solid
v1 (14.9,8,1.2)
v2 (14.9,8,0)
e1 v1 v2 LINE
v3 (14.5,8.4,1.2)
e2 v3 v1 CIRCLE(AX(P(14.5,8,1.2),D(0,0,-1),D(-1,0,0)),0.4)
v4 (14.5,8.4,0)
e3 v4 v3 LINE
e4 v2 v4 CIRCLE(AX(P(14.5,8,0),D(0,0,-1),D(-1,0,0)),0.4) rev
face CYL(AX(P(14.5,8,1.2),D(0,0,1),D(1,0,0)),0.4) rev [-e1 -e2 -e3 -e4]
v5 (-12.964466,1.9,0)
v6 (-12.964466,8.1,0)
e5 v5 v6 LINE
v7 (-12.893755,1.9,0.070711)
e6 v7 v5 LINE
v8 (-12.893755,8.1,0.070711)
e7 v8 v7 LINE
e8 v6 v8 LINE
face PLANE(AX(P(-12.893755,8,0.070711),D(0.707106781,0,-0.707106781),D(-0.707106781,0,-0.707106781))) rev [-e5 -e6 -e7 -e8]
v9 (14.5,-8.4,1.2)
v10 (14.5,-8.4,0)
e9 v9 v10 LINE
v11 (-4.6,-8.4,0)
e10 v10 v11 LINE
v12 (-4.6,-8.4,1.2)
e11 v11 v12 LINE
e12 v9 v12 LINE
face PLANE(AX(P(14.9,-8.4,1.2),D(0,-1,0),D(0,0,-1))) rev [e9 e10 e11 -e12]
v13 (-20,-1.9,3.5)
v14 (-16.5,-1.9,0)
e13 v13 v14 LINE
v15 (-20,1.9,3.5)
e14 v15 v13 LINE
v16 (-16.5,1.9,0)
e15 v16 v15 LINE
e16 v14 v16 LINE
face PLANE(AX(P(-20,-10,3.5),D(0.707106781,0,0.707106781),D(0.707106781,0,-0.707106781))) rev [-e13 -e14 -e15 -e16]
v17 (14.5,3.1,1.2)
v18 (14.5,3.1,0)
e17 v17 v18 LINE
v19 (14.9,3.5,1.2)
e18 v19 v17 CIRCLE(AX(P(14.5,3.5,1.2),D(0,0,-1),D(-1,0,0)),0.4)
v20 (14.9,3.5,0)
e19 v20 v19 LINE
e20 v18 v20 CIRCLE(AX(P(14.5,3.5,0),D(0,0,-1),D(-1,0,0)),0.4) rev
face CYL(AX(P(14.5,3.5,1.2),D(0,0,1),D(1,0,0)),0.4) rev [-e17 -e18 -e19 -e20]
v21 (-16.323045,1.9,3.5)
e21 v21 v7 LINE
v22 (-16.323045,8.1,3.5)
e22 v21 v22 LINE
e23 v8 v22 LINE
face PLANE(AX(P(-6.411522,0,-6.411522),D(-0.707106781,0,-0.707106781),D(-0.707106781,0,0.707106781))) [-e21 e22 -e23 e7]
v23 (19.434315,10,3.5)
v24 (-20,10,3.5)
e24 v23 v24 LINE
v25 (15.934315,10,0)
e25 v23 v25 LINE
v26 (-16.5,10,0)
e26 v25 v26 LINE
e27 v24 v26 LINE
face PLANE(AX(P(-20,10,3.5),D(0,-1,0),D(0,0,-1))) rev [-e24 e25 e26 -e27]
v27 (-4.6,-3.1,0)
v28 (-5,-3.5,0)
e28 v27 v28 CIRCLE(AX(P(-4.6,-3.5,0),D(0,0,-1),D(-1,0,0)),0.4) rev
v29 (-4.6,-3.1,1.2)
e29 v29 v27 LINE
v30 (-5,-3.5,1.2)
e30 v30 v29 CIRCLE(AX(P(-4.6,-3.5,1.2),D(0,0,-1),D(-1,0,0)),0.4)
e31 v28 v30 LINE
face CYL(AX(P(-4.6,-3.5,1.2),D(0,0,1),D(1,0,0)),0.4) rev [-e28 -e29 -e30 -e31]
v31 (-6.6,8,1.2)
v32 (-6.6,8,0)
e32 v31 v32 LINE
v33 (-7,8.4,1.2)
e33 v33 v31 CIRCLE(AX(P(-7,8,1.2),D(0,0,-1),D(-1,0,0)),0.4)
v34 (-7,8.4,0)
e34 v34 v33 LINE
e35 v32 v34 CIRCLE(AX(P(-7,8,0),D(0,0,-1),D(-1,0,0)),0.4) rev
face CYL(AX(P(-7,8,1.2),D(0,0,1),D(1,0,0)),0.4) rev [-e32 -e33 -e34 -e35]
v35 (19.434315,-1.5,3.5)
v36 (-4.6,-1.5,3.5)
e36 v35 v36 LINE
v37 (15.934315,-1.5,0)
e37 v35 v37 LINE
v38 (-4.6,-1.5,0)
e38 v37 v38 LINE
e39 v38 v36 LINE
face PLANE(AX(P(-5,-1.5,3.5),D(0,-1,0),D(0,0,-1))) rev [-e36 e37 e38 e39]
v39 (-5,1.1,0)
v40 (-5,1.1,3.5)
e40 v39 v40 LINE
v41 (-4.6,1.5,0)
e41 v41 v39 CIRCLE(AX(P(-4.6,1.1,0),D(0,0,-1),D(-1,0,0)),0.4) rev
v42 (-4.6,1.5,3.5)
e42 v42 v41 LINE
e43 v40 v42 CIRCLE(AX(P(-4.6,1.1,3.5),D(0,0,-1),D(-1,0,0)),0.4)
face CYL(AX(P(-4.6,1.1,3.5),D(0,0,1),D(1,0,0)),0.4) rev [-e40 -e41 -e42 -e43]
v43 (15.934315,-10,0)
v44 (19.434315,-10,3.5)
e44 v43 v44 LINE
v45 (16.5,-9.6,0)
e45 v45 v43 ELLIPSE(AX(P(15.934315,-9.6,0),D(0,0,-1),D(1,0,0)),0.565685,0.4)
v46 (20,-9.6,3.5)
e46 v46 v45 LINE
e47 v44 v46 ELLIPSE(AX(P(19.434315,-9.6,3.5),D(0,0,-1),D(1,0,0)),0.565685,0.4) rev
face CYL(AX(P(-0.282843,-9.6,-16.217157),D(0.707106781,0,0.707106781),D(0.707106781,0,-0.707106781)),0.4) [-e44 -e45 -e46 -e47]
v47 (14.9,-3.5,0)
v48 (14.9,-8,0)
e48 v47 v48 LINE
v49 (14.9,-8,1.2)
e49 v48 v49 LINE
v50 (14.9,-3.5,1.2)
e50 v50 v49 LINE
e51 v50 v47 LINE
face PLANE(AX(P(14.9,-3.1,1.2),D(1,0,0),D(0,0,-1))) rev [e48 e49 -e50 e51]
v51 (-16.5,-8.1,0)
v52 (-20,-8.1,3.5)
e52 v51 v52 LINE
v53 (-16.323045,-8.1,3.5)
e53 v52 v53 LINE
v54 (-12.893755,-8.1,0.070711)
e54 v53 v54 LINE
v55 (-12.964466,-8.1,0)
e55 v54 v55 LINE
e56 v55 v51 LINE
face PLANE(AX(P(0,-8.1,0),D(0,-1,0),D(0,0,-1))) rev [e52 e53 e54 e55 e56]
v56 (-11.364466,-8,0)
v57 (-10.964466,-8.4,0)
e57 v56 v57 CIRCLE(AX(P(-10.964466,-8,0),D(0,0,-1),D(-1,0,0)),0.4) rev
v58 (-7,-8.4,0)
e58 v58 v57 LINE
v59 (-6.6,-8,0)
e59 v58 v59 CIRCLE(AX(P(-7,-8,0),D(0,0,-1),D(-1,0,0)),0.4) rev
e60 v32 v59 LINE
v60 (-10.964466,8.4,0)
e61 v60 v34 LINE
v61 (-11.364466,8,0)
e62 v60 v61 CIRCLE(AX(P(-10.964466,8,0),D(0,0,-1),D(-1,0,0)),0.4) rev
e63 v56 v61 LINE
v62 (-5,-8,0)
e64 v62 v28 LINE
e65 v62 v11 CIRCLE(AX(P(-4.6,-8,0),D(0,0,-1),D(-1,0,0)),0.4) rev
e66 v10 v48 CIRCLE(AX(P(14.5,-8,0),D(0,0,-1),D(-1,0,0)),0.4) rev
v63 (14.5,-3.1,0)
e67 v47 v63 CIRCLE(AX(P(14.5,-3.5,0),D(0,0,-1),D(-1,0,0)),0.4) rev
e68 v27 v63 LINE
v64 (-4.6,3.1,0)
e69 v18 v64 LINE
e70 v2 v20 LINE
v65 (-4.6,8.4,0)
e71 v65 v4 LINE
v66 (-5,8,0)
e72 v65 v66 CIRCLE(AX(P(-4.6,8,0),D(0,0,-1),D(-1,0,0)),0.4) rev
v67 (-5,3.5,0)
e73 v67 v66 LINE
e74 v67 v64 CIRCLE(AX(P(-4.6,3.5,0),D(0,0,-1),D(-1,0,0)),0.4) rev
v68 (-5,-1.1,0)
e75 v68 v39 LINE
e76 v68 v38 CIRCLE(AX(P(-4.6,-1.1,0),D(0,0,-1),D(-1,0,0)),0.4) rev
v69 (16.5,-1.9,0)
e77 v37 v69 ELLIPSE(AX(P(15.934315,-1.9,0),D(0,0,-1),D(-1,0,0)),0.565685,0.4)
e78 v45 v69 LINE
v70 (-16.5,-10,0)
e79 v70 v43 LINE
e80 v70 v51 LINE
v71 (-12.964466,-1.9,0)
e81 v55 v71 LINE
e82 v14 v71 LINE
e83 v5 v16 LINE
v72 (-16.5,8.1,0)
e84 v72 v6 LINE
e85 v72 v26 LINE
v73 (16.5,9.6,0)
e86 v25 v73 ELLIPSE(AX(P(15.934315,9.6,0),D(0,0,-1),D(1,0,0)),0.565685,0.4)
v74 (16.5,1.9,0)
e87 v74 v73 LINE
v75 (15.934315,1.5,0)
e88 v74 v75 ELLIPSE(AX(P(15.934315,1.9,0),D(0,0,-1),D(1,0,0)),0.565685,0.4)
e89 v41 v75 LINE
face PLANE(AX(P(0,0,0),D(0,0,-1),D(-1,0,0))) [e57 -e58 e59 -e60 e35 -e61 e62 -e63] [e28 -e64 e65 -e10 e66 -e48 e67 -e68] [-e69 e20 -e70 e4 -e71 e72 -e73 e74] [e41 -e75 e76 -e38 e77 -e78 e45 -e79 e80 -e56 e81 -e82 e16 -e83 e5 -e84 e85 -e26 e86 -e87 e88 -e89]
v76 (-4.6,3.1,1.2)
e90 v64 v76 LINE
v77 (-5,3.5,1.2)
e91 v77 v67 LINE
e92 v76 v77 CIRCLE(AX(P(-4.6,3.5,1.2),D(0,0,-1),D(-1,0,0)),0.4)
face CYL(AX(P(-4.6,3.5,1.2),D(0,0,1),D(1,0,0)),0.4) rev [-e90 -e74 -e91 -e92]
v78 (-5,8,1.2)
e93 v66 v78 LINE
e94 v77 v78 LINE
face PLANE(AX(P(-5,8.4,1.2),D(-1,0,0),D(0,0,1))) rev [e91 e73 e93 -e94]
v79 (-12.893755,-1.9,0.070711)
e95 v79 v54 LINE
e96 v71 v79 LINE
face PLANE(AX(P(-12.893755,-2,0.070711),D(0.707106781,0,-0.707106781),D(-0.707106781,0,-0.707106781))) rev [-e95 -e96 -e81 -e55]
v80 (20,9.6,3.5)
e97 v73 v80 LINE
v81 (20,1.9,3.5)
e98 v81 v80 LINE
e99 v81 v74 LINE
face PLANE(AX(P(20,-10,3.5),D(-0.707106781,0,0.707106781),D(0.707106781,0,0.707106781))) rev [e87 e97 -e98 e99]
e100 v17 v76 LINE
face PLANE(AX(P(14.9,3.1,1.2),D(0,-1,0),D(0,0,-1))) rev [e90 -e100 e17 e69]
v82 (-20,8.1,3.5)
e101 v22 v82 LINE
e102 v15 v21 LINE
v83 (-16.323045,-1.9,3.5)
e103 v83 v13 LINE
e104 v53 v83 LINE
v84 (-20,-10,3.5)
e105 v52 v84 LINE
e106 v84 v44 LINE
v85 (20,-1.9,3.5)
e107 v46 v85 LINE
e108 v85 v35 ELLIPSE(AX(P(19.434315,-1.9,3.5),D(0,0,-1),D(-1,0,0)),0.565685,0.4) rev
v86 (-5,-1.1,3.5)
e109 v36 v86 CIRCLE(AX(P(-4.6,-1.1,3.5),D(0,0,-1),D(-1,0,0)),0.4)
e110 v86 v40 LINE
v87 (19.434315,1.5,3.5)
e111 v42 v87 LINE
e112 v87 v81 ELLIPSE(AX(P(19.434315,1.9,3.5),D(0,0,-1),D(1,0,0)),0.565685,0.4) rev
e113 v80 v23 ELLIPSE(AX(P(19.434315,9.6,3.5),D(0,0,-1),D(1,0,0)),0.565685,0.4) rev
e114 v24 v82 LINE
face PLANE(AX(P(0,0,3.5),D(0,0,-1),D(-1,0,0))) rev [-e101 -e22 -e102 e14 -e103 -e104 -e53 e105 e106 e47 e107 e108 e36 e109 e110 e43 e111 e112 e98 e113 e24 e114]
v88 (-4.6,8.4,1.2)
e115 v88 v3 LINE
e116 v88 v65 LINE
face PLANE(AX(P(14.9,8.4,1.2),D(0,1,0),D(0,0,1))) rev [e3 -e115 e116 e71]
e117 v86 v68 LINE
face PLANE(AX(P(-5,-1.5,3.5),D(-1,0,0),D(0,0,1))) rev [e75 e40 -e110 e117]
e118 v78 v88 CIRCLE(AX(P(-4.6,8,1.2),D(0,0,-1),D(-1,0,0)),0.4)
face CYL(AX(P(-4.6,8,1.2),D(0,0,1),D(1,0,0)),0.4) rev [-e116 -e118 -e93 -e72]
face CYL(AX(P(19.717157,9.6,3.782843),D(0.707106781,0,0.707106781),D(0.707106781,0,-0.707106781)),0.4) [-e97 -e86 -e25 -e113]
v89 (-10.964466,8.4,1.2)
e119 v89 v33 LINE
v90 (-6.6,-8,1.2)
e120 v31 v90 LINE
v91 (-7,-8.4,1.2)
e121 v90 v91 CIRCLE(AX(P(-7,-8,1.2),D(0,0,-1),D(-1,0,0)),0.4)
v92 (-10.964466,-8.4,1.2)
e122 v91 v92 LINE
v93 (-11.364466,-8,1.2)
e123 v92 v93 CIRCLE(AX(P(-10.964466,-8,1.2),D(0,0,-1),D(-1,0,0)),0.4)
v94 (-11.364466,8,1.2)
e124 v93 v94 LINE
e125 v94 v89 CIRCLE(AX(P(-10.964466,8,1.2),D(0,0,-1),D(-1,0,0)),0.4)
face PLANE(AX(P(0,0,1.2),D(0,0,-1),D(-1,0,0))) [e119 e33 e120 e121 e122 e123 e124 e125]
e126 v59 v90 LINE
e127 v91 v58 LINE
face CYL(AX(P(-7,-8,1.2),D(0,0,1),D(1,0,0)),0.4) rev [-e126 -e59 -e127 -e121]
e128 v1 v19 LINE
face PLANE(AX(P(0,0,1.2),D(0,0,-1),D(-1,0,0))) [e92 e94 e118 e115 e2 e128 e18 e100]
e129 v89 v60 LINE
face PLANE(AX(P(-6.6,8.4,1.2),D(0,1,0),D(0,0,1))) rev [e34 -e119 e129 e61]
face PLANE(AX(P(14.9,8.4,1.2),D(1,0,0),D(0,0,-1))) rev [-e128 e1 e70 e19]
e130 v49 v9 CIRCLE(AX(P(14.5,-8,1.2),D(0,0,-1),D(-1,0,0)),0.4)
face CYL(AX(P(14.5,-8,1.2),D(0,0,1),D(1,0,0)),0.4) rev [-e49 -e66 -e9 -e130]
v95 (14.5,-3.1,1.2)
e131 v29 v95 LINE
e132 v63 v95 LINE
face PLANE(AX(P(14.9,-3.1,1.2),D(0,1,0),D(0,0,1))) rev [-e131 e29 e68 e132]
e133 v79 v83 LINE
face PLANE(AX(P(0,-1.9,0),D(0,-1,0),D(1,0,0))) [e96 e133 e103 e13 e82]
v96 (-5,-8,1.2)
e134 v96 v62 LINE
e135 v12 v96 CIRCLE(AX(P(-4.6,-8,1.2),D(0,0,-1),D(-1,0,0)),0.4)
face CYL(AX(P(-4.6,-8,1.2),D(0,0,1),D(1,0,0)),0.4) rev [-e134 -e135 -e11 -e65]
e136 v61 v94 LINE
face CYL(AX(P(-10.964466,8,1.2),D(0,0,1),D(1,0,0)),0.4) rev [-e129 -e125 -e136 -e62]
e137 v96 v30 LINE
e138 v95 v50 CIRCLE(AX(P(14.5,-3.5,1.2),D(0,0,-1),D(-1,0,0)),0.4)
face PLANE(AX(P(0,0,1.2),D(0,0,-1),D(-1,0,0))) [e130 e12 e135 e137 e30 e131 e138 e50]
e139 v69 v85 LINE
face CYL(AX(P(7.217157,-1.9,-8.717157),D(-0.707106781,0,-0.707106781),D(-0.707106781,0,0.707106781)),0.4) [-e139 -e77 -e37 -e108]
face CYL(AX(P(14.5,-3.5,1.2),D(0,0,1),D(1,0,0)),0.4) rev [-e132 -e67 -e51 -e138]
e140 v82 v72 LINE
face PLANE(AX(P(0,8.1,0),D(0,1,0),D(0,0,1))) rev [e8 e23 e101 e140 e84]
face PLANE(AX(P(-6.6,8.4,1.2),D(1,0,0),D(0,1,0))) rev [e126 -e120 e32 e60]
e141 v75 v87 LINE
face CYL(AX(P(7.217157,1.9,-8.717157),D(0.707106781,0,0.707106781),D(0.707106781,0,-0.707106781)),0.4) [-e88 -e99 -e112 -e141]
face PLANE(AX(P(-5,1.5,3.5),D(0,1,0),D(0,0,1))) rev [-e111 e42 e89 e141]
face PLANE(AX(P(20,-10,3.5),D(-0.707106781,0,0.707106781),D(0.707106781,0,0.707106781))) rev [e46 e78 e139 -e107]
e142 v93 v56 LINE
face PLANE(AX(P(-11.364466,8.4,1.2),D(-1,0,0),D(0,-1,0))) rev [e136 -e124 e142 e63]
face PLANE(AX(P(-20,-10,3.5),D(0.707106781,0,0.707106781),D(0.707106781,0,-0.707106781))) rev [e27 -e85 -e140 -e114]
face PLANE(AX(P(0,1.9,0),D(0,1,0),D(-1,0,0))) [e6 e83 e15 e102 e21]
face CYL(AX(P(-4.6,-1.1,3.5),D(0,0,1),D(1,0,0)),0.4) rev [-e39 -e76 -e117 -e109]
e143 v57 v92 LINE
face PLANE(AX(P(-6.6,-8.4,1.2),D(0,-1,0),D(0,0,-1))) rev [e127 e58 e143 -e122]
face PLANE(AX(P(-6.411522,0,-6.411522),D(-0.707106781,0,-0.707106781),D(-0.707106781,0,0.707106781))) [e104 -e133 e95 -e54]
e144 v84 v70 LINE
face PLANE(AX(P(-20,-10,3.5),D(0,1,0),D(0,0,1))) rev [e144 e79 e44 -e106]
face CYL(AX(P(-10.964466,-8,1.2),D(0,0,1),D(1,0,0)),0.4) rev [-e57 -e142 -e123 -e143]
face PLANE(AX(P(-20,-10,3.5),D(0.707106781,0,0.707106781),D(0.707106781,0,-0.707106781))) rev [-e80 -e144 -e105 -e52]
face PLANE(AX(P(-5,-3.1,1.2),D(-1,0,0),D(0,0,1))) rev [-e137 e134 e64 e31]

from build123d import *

# Parameters (mm, degrees)
BOSS_EXTRUDE1_DEPTH = 3.5
CUT_EXTRUDE1_DEPTH  = 29.5
CUT_EXTRUDE2_DEPTH  = 29.5
CAVITY1_START       = -8
CAVITY1_DEPTH       = 6
CAVITY1_START_2     = 2
CAVITY1_2_DEPTH     = 6
SKETCH4_W           = 4.949747468
SKETCH4_H           = 6
CUT_EXTRUDE3_DEPTH  = 0.1
CUT_EXTRUDE4_DEPTH  = 0.1
CUT_EXTRUDE5_DEPTH  = 0.1
CUT_EXTRUDE6_DEPTH  = 0.1
CUT_EXTRUDE7_DEPTH  = 0.1
SKETCH9_W           = 19.9
SKETCH9_H           = 5.3
SKETCH9_W_2         = 4.764466094
SKETCH9_H_2         = 16.8
CUT_EXTRUDE8_DEPTH  = 1.2
FILLET1_R           = 0.4


# Read off the part's stored shape, not the designer's step: Cavity1
with BuildPart() as part:
    # Sketch1 → Boss-Extrude1 (new body)
    with BuildSketch(Plane.XY):
        Polygon((20, -1.5), (20, -10), (-20, -10), (-20, 10), (20, 10), (20, 1.5), (-5, 1.5), (-5, -1.5), align=None)
    extrude(amount=BOSS_EXTRUDE1_DEPTH)

    # Sketch2 → Cut-Extrude1 (cut, through all)
    with BuildSketch(Plane(origin=(0, 10, 0), x_dir=(1, 0, 0), z_dir=(0, 1, 0))):
        Polygon((20, -3.5), (16.5, 0), (20, 0), align=None)
    extrude(amount=-CUT_EXTRUDE1_DEPTH, mode=Mode.SUBTRACT)

    # Sketch3 → Cut-Extrude2 (cut, through all)
    with BuildSketch(Plane(origin=(0, 10, 0), x_dir=(1, 0, 0), z_dir=(0, 1, 0))):
        Polygon((-20, -3.5), (-16.5, 0), (-20, 0), align=None)
    extrude(amount=-CUT_EXTRUDE2_DEPTH, mode=Mode.SUBTRACT)

    # Cavity1 outline → Cavity1 (cut)
    with BuildSketch(Plane(origin=(0, 0, 0), x_dir=(1, 0, 0), z_dir=(0, 1, 0)).offset(CAVITY1_START)):
        Polygon((-16.464466094, -3.5), (-12.964466094, 0), (-16.5, 0), (-20, -3.5), align=None)
    extrude(amount=CAVITY1_DEPTH, mode=Mode.SUBTRACT)

    # Cavity1 2 outline → Cavity1 2 (cut)
    with BuildSketch(Plane(origin=(0, 0, 0), x_dir=(1, 0, 0), z_dir=(0, 1, 0)).offset(CAVITY1_START_2)):
        Polygon((-16.464466094, -3.5), (-12.964466094, 0), (-16.5, 0), (-20, -3.5), align=None)
    extrude(amount=CAVITY1_2_DEPTH, mode=Mode.SUBTRACT)

    # Sketch4 → Cut-Extrude3 (cut)
    with BuildSketch(Plane(origin=(-6.482233047, 0, -6.482233047), x_dir=(-0.7071067811865464, 0, 0.7071067811865488), z_dir=(-0.7071067811865488, 0, -0.7071067811865464))):
        with Locations((11.642135624, -5)):
            Rectangle(SKETCH4_W, SKETCH4_H)
        with Locations((11.642135624, 5)):
            Rectangle(SKETCH4_W, SKETCH4_H)
    extrude(amount=-CUT_EXTRUDE3_DEPTH, mode=Mode.SUBTRACT)

    # Sketch5 → Cut-Extrude4 (cut)
    with BuildSketch(Plane.XZ.offset(2)):
        Polygon((-16.5, 0), (-12.964466094, 0), (-12.893755416, 0.070710678), (-16.323044738, 3.5), (-20, 3.5), align=None)
    extrude(amount=-CUT_EXTRUDE4_DEPTH, mode=Mode.SUBTRACT)

    # Sketch6 → Cut-Extrude5 (cut)
    with BuildSketch(Plane.XZ.offset(-8)):
        Polygon((-16.323044738, 3.5), (-20, 3.5), (-16.5, 0), (-12.964466094, 0), (-12.893755416, 0.070710678), align=None)
    extrude(amount=-CUT_EXTRUDE5_DEPTH, mode=Mode.SUBTRACT)

    # Sketch7 → Cut-Extrude6 (cut)
    with BuildSketch(Plane(origin=(0, 2, 0), x_dir=(1, 0, 0), z_dir=(0, 1, 0))):
        Polygon((-20, -3.5), (-16.323044738, -3.5), (-12.893755416, -0.070710678), (-12.964466094, 0), (-16.5, 0), align=None)
    extrude(amount=-CUT_EXTRUDE6_DEPTH, mode=Mode.SUBTRACT)

    # Sketch8 → Cut-Extrude7 (cut)
    with BuildSketch(Plane(origin=(0, -8, 0), x_dir=(1, 0, 0), z_dir=(0, 1, 0))):
        Polygon((-20, -3.5), (-16.323044738, -3.5), (-12.893755416, -0.070710678), (-12.964466094, 0), (-16.5, 0), align=None)
    extrude(amount=-CUT_EXTRUDE7_DEPTH, mode=Mode.SUBTRACT)

    # Sketch9 → Cut-Extrude8 (cut)
    with BuildSketch(Plane(origin=(0, 0, 0), x_dir=(-1, 0, 0), z_dir=(0, 0, -1))):
        with Locations((-4.95, 5.75)):
            Rectangle(SKETCH9_W, SKETCH9_H)
        with Locations((-4.95, -5.75)):
            Rectangle(SKETCH9_W, SKETCH9_H)
        with Locations((8.982233047, 0)):
            Rectangle(SKETCH9_W_2, SKETCH9_H_2)
    extrude(amount=-CUT_EXTRUDE8_DEPTH, mode=Mode.SUBTRACT)

    # Fillet1
    fillet1_edges = [part.edges().sort_by_distance(p)[0] for p in [
        (-5, 1.5, 1.75),
        (-5, -1.5, 1.75),
        (-6.6, -8.4, 0.6),
        (-6.6, 8.4, 0.6),
        (-11.364466094, 8.4, 0.6),
        (-11.364466094, -8.4, 0.6),
        (14.9, -8.4, 0.6),
        (14.9, -3.1, 0.6),
        (-5, -3.1, 0.6),
        (-5, -8.4, 0.6),
        (14.9, 3.1, 0.6),
        (14.9, 8.4, 0.6),
        (-5, 8.4, 0.6),
        (-5, 3.1, 0.6),
        (18.25, -1.5, 1.75),
        (18.25, -10, 1.75),
        (18.25, 1.5, 1.75),
        (18.25, 10, 1.75),
    ]]
    fillet(fillet1_edges, radius=FILLET1_R)


solid = part.part
